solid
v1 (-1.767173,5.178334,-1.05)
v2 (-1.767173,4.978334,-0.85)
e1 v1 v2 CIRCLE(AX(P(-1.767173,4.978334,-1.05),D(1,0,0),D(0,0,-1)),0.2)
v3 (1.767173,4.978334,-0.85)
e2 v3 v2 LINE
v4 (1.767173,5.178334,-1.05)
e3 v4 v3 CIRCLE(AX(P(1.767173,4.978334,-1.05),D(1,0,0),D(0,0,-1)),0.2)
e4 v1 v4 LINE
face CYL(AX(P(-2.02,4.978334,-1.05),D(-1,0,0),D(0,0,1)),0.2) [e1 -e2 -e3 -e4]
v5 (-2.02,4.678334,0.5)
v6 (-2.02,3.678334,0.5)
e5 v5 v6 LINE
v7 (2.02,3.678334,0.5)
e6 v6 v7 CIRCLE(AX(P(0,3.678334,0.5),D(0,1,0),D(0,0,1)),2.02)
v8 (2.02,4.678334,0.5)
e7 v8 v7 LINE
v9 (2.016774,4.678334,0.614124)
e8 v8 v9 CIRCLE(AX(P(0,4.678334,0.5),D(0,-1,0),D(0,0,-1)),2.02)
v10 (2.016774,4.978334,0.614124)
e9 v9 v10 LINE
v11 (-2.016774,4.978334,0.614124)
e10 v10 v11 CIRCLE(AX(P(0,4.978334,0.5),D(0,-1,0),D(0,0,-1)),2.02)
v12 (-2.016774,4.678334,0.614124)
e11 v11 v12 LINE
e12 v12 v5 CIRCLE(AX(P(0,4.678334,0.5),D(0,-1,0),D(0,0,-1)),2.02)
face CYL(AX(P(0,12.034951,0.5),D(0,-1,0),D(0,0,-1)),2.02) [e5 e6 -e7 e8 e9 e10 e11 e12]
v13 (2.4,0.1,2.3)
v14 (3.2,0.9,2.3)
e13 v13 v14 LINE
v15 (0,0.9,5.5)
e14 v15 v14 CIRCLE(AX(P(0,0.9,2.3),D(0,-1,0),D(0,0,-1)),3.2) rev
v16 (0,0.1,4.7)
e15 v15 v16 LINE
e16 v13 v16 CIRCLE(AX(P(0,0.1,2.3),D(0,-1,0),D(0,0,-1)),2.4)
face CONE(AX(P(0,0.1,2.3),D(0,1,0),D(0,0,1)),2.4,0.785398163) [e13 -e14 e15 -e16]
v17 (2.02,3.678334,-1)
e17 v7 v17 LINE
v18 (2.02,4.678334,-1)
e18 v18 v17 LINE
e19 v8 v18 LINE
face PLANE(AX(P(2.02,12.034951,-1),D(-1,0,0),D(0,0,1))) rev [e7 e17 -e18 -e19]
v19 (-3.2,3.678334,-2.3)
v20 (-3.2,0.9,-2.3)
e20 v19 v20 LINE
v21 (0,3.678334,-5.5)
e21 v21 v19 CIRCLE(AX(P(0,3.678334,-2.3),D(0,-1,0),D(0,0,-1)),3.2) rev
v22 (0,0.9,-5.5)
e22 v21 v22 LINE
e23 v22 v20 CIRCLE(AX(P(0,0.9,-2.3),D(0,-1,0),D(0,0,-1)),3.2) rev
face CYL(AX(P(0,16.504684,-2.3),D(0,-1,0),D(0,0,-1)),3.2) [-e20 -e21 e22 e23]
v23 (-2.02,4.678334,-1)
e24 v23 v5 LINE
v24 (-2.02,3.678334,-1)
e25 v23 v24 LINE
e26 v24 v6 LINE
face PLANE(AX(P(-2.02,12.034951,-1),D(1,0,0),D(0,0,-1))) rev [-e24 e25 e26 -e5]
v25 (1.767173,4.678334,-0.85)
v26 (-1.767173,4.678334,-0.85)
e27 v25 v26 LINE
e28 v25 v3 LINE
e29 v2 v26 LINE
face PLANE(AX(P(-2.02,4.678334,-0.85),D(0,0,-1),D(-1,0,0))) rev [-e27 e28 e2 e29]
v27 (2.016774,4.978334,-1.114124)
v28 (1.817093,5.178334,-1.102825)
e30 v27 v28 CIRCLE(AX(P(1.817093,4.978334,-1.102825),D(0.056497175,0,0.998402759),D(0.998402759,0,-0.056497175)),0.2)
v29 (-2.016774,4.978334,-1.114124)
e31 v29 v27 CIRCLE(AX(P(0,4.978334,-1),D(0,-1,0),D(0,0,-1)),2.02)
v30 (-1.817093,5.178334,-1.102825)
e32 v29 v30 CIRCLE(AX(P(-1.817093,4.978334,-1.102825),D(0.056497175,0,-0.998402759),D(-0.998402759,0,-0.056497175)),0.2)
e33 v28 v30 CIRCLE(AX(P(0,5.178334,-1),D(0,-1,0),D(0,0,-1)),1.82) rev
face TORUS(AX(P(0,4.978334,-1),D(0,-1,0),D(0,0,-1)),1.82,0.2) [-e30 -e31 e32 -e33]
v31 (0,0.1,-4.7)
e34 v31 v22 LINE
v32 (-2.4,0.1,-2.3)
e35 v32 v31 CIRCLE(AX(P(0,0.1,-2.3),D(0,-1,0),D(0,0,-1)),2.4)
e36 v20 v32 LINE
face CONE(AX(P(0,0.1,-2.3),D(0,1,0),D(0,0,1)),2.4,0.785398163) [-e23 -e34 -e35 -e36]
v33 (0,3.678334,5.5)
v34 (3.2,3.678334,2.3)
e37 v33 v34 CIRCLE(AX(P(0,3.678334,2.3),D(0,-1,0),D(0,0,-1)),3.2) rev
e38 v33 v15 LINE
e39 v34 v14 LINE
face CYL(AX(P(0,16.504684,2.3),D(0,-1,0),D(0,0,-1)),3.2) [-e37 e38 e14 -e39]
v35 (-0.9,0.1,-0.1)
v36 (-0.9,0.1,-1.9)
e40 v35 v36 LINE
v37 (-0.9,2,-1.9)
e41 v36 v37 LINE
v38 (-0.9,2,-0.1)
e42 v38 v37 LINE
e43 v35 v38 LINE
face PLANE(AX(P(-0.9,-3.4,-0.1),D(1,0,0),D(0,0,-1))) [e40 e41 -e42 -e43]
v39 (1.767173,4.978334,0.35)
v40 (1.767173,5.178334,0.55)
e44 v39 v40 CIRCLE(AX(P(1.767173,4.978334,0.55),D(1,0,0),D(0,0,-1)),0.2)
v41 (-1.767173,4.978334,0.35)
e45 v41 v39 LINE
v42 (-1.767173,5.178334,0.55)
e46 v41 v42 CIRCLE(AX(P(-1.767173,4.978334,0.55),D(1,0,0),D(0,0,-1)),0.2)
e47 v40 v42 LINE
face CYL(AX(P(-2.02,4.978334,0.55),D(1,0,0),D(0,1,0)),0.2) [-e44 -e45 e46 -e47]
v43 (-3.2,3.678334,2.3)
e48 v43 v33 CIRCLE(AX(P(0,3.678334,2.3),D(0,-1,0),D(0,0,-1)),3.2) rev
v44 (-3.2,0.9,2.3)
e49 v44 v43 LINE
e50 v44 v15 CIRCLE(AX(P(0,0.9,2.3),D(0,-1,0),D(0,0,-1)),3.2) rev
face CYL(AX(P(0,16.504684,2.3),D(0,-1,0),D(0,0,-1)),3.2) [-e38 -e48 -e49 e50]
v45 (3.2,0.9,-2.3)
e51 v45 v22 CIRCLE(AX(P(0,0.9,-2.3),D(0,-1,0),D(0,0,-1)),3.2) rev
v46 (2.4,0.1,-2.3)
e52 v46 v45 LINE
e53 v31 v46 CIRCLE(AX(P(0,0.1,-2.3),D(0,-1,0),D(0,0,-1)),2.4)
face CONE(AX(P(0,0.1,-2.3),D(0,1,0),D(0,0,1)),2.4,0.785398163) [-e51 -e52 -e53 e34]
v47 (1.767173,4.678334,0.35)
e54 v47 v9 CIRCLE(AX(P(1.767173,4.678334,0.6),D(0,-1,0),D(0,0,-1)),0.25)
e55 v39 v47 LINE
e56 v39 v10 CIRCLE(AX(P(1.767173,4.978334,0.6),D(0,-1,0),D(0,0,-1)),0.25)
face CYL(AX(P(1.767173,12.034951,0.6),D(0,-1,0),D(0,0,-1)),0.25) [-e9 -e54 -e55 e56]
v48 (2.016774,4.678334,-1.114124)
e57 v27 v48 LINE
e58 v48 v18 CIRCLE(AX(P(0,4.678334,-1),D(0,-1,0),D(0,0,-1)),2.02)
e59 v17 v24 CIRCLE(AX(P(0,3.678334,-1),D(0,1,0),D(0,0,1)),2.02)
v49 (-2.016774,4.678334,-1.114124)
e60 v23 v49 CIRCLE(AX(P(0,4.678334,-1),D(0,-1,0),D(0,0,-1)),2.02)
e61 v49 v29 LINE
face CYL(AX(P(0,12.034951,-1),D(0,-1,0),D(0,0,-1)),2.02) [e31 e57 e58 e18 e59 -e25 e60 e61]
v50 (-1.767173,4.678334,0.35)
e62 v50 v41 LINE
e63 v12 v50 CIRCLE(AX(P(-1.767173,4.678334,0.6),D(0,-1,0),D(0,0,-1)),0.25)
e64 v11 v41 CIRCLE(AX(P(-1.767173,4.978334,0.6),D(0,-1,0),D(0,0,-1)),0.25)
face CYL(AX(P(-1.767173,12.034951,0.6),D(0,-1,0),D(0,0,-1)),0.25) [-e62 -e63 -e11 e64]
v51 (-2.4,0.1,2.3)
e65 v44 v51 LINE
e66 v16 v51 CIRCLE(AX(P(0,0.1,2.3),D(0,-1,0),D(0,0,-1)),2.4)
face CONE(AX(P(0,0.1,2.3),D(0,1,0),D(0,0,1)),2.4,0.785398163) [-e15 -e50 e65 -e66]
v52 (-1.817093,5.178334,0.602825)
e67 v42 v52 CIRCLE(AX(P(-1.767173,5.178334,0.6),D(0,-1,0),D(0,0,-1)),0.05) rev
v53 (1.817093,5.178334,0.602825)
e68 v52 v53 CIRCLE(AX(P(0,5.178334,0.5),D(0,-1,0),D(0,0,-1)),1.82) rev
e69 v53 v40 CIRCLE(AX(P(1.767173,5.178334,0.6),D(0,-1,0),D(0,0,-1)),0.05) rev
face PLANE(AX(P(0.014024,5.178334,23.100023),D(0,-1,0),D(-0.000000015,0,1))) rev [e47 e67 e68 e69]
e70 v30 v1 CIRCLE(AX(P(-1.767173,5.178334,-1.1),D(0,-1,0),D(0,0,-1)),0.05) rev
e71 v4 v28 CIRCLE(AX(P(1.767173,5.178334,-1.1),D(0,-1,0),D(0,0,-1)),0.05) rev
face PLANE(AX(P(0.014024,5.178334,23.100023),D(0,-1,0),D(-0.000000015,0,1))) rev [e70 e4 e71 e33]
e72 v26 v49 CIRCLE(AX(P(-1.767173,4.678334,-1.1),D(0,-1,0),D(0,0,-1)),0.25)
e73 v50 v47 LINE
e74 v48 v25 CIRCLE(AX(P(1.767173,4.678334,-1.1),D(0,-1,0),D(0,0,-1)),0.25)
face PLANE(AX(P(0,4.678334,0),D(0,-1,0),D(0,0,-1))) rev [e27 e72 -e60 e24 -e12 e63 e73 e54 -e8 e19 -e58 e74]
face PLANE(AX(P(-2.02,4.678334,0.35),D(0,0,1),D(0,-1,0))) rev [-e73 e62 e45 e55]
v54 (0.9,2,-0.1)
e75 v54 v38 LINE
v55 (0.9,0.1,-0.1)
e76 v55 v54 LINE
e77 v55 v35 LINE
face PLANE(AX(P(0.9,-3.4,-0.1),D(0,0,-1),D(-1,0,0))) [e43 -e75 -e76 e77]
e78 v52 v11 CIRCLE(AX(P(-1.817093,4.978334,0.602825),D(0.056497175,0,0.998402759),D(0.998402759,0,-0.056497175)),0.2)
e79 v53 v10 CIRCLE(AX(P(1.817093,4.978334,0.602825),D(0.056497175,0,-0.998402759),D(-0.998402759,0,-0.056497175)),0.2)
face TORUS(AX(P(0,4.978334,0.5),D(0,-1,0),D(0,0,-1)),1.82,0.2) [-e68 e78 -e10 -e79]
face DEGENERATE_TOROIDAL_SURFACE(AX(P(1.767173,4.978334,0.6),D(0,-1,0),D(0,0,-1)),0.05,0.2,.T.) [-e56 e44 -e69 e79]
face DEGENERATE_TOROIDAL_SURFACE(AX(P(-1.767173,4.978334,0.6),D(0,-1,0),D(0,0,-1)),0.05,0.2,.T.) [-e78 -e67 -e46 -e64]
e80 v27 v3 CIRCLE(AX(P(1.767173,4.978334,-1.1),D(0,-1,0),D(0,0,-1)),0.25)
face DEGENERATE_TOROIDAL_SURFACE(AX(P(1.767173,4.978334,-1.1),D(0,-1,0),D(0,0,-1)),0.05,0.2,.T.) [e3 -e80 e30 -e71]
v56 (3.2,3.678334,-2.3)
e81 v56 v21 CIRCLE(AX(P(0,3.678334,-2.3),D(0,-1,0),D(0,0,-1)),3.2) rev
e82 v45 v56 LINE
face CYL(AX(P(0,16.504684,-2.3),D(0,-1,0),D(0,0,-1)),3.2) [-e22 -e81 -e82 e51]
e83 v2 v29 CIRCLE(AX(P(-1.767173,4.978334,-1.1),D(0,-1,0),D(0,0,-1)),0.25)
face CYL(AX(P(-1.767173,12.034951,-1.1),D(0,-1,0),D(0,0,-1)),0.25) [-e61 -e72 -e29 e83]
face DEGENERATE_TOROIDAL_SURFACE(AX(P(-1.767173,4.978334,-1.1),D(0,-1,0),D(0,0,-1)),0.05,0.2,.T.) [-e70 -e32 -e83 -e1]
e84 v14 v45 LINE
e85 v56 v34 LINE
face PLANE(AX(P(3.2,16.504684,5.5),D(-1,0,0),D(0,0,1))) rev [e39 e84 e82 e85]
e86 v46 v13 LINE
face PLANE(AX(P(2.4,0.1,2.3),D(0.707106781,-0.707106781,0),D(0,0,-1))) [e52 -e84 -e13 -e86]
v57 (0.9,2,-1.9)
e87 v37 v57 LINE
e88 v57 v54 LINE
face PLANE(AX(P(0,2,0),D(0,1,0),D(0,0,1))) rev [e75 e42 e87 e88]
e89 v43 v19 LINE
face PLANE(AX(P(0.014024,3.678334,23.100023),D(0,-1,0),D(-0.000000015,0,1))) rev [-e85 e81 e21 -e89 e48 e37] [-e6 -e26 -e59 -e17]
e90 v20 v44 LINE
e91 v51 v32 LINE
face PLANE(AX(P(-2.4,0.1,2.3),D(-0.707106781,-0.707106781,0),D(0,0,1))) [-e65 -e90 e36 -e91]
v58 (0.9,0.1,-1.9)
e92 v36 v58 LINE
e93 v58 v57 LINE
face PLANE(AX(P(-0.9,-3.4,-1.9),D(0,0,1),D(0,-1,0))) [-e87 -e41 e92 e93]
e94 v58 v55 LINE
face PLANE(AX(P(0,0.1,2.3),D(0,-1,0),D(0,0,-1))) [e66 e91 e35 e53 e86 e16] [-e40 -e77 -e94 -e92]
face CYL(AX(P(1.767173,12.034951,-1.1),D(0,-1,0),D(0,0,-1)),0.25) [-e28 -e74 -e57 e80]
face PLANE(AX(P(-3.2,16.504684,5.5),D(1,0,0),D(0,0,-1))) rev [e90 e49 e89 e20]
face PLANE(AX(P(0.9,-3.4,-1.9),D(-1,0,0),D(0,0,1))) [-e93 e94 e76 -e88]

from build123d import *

# Parameters (mm, degrees)
SKETCH_1_W              = 6.4
SKETCH_1_H              = 11
EXTRUDE_1_DEPTH         = 3.678333878
FILLET_1_R              = 3.2
EXTRUDE_2_DEPTH         = 1.5
SKETCH_3_W              = 4.04000003
SKETCH_3_H              = 1.2
CUT_EXTRUDE_1_DEPTH     = 0.5
FILLET_2_R              = 0.25
FILLET_3_R              = 0.2
OTHER_2_OUTLINE_W       = 1.5
OTHER_2_OUTLINE_H       = 1.5
OTHER_2_DEPTH           = 2
SKETCH_5_W              = 1.8
SKETCH_5_H              = 1.8
CUT_EXTRUDE_2_DEPTH     = 5.4
CUT_EXTRUDE_START       = -0.1
CUT_EXTRUDE_3_OUTLINE_W = 10
CUT_EXTRUDE_3_OUTLINE_H = 14
CUT_EXTRUDE_3_DEPTH     = 0.1
CHAMFER_1_SIZE          = 0.8


# Read off the part's stored shape, not the designer's step: 压凹2, 切除-拉伸3
# Some blends are built 0.0001 mm under size
with BuildPart() as part:
    # 草图1 → 凸台-拉伸1 (new body)
    with BuildSketch(Plane(origin=(0, 0, 0), x_dir=(1, 0, 0), z_dir=(0, 1, 0))):
        Rectangle(SKETCH_1_W, SKETCH_1_H)
    extrude(amount=EXTRUDE_1_DEPTH)

    # 圆角1
    fillet_1_edges = [part.edges().sort_by_distance(p)[0] for p in [
        (-3.2, 1.839166939, -5.5),
        (3.2, 1.839166939, -5.5),
        (3.2, 1.839166939, 5.5),
        (-3.2, 1.839166939, 5.5),
    ]]
    fillet(fillet_1_edges, radius=FILLET_1_R - 0.0001)  # a hair under: the kernel refuses the full size

    # 草图2 → 凸台-拉伸2 (add)
    with BuildSketch(Plane(origin=(0, 3.678333878, 0), x_dir=(1, 0, 0), z_dir=(0, 1, 0))):
        with BuildLine():
            Line((2.020000015, 1), (2.020000015, -0.5))
            ThreePointArc((2.020000015, -0.5), (0, -2.520000015), (-2.020000015, -0.5))
            Line((-2.020000015, -0.5), (-2.020000015, 1))
            ThreePointArc((-2.020000015, 1), (1.5e-08, 3.02), (2.020000015, 1))
        make_face()
    extrude(amount=EXTRUDE_2_DEPTH)

    # 草图3 → 切除-拉伸1 (cut)
    with BuildSketch(Plane(origin=(0, 5.178333878, 0), x_dir=(1, 0, 0), z_dir=(0, 1, 0))):
        with Locations((0, 0.25)):
            Rectangle(SKETCH_3_W, SKETCH_3_H)
    extrude(amount=-CUT_EXTRUDE_1_DEPTH, mode=Mode.SUBTRACT)

    # 圆角2
    # the kernel refuses this fillet: 0.25 mm, written as the material it takes off along each edge
    with BuildSketch(Plane(origin=(2.020000015, 5.838693877, 0.35), x_dir=(-0.012214651008913897, 0, 0.9999253983676635), z_dir=(0, -1, 0))) as fillet_2_piece_1:
        with BuildLine():
            CenterArc((0.253069545, 0.249754592), FILLET_2_R, 179.300134646, 93.238774214)
            Line((0.003088195, 0.252808255), (-0.02190994, 0.253113621))
            Line((-0.02190994, 0.253113621), (-0.024998135, 0.000305366))
            Line((-0.024998135, 0.000305366), (-0.000305366, -0.024998135))
            ThreePointArc((-0.000305366, -0.024998135), (0.149683443, -0.026830333), (0.265251445, -0.024975459))
            Line((0.265251445, -0.024975459), (0.264143999, 0))
        make_face()
    extrude(amount=1.160359998, mode=Mode.SUBTRACT)
    with BuildSketch(Plane(origin=(2.020000015, 5.838693882, -0.85), x_dir=(-0.012214654567378504, 0, -0.9999253983241949), z_dir=(0, -1, 0))) as fillet_2_piece_2:
        with BuildLine():
            CenterArc((0.253069545, -0.249754592), FILLET_2_R, 87.46109086, 93.238774699)
            Line((0.003088196, -0.252808256), (-0.021909939, -0.253113622))
            Line((-0.021909939, -0.253113622), (-0.024998135, -0.000305366))
            Line((-0.024998135, -0.000305366), (-0.000305366, 0.024998135))
            ThreePointArc((-0.000305366, 0.024998135), (0.149683444, 0.026830333), (0.265251447, 0.024975459))
            Line((0.265251447, 0.024975459), (0.264144001, 0))
        make_face()
    extrude(amount=1.160360003, mode=Mode.SUBTRACT)
    with BuildSketch(Plane(origin=(-2.020000015, 5.838693877, 0.35), x_dir=(0.012214651008913804, 0, 0.9999253983676635), z_dir=(0, -1, 0))) as fillet_2_piece_3:
        with BuildLine():
            CenterArc((0.253069545, -0.249754592), FILLET_2_R, 87.461091141, 93.238774214)
            Line((0.003088195, -0.252808255), (-0.02190994, -0.253113621))
            Line((-0.02190994, -0.253113621), (-0.024998135, -0.000305366))
            Line((-0.024998135, -0.000305366), (-0.000305366, 0.024998135))
            ThreePointArc((-0.000305366, 0.024998135), (0.149683443, 0.026830333), (0.265251445, 0.024975459))
            Line((0.265251445, 0.024975459), (0.264143999, 0))
        make_face()
    extrude(amount=1.160359998, mode=Mode.SUBTRACT)
    with BuildSketch(Plane(origin=(-2.020000015, 5.838693882, -0.85), x_dir=(0.012214654567376798, 0, -0.9999253983241947), z_dir=(0, -1, 0))) as fillet_2_piece_4:
        with BuildLine():
            CenterArc((0.253069545, 0.249754592), FILLET_2_R, 179.300134442, 93.238774699)
            Line((0.003088196, 0.252808256), (-0.021909939, 0.253113622))
            Line((-0.021909939, 0.253113622), (-0.024998135, 0.000305366))
            Line((-0.024998135, 0.000305366), (-0.000305366, -0.024998135))
            ThreePointArc((-0.000305366, -0.024998135), (0.149683444, -0.026830333), (0.265251447, -0.024975459))
            Line((0.265251447, -0.024975459), (0.264144001, 0))
        make_face()
    extrude(amount=1.160360003, mode=Mode.SUBTRACT)

    # 圆角3
    fillet_3_edges = [part.edges().sort_by_distance(p)[0] for p in [
        (0, 5.178333878, 2.520000015),
        (0, 5.178333878, 0.35),
        (-1.948874678, 5.178333878, 0.428289595),
        (1.948874678, 5.178333878, 0.428289595),
        (0, 5.178333878, -0.85),
        (0, 5.178333878, -3.02),
        (-1.948874678, 5.178333878, -0.928289595),
        (1.948874678, 5.178333878, -0.928289595),
    ]]
    fillet(fillet_3_edges, radius=FILLET_3_R)

    # 压凹2 outline → 压凹2 (cut)
    with BuildSketch(Plane(origin=(0, 0, 0), x_dir=(1, 0, 0), z_dir=(0, 1, 0))):
        with Locations((0, 1)):
            Rectangle(OTHER_2_OUTLINE_W, OTHER_2_OUTLINE_H)
    extrude(amount=OTHER_2_DEPTH, mode=Mode.SUBTRACT)

    # 草图5 → 切除-拉伸2 (cut)
    with BuildSketch(Plane.XZ.offset(-2)):
        with Locations((0, -1)):
            Rectangle(SKETCH_5_W, SKETCH_5_H)
    extrude(amount=CUT_EXTRUDE_2_DEPTH, mode=Mode.SUBTRACT)

    # 切除-拉伸3 outline → 切除-拉伸3 (cut)
    with BuildSketch(Plane.XZ.offset(CUT_EXTRUDE_START)):
        Rectangle(CUT_EXTRUDE_3_OUTLINE_W, CUT_EXTRUDE_3_OUTLINE_H)
    extrude(amount=CUT_EXTRUDE_3_DEPTH, mode=Mode.SUBTRACT)

    # 倒角1
    chamfer_1_edges = [part.edges().sort_by_distance(p)[0] for p in [
        (2.262770989, 0.1, 4.562770989),
        (-2.262770989, 0.1, -4.562770989),
        (-2.262770989, 0.1, 4.562770989),
        (3.2, 0.1, 0),
        (2.262770989, 0.1, -4.562770989),
        (-3.2, 0.1, 0),
    ]]
    chamfer(chamfer_1_edges, length=CHAMFER_1_SIZE)


solid = part.part
